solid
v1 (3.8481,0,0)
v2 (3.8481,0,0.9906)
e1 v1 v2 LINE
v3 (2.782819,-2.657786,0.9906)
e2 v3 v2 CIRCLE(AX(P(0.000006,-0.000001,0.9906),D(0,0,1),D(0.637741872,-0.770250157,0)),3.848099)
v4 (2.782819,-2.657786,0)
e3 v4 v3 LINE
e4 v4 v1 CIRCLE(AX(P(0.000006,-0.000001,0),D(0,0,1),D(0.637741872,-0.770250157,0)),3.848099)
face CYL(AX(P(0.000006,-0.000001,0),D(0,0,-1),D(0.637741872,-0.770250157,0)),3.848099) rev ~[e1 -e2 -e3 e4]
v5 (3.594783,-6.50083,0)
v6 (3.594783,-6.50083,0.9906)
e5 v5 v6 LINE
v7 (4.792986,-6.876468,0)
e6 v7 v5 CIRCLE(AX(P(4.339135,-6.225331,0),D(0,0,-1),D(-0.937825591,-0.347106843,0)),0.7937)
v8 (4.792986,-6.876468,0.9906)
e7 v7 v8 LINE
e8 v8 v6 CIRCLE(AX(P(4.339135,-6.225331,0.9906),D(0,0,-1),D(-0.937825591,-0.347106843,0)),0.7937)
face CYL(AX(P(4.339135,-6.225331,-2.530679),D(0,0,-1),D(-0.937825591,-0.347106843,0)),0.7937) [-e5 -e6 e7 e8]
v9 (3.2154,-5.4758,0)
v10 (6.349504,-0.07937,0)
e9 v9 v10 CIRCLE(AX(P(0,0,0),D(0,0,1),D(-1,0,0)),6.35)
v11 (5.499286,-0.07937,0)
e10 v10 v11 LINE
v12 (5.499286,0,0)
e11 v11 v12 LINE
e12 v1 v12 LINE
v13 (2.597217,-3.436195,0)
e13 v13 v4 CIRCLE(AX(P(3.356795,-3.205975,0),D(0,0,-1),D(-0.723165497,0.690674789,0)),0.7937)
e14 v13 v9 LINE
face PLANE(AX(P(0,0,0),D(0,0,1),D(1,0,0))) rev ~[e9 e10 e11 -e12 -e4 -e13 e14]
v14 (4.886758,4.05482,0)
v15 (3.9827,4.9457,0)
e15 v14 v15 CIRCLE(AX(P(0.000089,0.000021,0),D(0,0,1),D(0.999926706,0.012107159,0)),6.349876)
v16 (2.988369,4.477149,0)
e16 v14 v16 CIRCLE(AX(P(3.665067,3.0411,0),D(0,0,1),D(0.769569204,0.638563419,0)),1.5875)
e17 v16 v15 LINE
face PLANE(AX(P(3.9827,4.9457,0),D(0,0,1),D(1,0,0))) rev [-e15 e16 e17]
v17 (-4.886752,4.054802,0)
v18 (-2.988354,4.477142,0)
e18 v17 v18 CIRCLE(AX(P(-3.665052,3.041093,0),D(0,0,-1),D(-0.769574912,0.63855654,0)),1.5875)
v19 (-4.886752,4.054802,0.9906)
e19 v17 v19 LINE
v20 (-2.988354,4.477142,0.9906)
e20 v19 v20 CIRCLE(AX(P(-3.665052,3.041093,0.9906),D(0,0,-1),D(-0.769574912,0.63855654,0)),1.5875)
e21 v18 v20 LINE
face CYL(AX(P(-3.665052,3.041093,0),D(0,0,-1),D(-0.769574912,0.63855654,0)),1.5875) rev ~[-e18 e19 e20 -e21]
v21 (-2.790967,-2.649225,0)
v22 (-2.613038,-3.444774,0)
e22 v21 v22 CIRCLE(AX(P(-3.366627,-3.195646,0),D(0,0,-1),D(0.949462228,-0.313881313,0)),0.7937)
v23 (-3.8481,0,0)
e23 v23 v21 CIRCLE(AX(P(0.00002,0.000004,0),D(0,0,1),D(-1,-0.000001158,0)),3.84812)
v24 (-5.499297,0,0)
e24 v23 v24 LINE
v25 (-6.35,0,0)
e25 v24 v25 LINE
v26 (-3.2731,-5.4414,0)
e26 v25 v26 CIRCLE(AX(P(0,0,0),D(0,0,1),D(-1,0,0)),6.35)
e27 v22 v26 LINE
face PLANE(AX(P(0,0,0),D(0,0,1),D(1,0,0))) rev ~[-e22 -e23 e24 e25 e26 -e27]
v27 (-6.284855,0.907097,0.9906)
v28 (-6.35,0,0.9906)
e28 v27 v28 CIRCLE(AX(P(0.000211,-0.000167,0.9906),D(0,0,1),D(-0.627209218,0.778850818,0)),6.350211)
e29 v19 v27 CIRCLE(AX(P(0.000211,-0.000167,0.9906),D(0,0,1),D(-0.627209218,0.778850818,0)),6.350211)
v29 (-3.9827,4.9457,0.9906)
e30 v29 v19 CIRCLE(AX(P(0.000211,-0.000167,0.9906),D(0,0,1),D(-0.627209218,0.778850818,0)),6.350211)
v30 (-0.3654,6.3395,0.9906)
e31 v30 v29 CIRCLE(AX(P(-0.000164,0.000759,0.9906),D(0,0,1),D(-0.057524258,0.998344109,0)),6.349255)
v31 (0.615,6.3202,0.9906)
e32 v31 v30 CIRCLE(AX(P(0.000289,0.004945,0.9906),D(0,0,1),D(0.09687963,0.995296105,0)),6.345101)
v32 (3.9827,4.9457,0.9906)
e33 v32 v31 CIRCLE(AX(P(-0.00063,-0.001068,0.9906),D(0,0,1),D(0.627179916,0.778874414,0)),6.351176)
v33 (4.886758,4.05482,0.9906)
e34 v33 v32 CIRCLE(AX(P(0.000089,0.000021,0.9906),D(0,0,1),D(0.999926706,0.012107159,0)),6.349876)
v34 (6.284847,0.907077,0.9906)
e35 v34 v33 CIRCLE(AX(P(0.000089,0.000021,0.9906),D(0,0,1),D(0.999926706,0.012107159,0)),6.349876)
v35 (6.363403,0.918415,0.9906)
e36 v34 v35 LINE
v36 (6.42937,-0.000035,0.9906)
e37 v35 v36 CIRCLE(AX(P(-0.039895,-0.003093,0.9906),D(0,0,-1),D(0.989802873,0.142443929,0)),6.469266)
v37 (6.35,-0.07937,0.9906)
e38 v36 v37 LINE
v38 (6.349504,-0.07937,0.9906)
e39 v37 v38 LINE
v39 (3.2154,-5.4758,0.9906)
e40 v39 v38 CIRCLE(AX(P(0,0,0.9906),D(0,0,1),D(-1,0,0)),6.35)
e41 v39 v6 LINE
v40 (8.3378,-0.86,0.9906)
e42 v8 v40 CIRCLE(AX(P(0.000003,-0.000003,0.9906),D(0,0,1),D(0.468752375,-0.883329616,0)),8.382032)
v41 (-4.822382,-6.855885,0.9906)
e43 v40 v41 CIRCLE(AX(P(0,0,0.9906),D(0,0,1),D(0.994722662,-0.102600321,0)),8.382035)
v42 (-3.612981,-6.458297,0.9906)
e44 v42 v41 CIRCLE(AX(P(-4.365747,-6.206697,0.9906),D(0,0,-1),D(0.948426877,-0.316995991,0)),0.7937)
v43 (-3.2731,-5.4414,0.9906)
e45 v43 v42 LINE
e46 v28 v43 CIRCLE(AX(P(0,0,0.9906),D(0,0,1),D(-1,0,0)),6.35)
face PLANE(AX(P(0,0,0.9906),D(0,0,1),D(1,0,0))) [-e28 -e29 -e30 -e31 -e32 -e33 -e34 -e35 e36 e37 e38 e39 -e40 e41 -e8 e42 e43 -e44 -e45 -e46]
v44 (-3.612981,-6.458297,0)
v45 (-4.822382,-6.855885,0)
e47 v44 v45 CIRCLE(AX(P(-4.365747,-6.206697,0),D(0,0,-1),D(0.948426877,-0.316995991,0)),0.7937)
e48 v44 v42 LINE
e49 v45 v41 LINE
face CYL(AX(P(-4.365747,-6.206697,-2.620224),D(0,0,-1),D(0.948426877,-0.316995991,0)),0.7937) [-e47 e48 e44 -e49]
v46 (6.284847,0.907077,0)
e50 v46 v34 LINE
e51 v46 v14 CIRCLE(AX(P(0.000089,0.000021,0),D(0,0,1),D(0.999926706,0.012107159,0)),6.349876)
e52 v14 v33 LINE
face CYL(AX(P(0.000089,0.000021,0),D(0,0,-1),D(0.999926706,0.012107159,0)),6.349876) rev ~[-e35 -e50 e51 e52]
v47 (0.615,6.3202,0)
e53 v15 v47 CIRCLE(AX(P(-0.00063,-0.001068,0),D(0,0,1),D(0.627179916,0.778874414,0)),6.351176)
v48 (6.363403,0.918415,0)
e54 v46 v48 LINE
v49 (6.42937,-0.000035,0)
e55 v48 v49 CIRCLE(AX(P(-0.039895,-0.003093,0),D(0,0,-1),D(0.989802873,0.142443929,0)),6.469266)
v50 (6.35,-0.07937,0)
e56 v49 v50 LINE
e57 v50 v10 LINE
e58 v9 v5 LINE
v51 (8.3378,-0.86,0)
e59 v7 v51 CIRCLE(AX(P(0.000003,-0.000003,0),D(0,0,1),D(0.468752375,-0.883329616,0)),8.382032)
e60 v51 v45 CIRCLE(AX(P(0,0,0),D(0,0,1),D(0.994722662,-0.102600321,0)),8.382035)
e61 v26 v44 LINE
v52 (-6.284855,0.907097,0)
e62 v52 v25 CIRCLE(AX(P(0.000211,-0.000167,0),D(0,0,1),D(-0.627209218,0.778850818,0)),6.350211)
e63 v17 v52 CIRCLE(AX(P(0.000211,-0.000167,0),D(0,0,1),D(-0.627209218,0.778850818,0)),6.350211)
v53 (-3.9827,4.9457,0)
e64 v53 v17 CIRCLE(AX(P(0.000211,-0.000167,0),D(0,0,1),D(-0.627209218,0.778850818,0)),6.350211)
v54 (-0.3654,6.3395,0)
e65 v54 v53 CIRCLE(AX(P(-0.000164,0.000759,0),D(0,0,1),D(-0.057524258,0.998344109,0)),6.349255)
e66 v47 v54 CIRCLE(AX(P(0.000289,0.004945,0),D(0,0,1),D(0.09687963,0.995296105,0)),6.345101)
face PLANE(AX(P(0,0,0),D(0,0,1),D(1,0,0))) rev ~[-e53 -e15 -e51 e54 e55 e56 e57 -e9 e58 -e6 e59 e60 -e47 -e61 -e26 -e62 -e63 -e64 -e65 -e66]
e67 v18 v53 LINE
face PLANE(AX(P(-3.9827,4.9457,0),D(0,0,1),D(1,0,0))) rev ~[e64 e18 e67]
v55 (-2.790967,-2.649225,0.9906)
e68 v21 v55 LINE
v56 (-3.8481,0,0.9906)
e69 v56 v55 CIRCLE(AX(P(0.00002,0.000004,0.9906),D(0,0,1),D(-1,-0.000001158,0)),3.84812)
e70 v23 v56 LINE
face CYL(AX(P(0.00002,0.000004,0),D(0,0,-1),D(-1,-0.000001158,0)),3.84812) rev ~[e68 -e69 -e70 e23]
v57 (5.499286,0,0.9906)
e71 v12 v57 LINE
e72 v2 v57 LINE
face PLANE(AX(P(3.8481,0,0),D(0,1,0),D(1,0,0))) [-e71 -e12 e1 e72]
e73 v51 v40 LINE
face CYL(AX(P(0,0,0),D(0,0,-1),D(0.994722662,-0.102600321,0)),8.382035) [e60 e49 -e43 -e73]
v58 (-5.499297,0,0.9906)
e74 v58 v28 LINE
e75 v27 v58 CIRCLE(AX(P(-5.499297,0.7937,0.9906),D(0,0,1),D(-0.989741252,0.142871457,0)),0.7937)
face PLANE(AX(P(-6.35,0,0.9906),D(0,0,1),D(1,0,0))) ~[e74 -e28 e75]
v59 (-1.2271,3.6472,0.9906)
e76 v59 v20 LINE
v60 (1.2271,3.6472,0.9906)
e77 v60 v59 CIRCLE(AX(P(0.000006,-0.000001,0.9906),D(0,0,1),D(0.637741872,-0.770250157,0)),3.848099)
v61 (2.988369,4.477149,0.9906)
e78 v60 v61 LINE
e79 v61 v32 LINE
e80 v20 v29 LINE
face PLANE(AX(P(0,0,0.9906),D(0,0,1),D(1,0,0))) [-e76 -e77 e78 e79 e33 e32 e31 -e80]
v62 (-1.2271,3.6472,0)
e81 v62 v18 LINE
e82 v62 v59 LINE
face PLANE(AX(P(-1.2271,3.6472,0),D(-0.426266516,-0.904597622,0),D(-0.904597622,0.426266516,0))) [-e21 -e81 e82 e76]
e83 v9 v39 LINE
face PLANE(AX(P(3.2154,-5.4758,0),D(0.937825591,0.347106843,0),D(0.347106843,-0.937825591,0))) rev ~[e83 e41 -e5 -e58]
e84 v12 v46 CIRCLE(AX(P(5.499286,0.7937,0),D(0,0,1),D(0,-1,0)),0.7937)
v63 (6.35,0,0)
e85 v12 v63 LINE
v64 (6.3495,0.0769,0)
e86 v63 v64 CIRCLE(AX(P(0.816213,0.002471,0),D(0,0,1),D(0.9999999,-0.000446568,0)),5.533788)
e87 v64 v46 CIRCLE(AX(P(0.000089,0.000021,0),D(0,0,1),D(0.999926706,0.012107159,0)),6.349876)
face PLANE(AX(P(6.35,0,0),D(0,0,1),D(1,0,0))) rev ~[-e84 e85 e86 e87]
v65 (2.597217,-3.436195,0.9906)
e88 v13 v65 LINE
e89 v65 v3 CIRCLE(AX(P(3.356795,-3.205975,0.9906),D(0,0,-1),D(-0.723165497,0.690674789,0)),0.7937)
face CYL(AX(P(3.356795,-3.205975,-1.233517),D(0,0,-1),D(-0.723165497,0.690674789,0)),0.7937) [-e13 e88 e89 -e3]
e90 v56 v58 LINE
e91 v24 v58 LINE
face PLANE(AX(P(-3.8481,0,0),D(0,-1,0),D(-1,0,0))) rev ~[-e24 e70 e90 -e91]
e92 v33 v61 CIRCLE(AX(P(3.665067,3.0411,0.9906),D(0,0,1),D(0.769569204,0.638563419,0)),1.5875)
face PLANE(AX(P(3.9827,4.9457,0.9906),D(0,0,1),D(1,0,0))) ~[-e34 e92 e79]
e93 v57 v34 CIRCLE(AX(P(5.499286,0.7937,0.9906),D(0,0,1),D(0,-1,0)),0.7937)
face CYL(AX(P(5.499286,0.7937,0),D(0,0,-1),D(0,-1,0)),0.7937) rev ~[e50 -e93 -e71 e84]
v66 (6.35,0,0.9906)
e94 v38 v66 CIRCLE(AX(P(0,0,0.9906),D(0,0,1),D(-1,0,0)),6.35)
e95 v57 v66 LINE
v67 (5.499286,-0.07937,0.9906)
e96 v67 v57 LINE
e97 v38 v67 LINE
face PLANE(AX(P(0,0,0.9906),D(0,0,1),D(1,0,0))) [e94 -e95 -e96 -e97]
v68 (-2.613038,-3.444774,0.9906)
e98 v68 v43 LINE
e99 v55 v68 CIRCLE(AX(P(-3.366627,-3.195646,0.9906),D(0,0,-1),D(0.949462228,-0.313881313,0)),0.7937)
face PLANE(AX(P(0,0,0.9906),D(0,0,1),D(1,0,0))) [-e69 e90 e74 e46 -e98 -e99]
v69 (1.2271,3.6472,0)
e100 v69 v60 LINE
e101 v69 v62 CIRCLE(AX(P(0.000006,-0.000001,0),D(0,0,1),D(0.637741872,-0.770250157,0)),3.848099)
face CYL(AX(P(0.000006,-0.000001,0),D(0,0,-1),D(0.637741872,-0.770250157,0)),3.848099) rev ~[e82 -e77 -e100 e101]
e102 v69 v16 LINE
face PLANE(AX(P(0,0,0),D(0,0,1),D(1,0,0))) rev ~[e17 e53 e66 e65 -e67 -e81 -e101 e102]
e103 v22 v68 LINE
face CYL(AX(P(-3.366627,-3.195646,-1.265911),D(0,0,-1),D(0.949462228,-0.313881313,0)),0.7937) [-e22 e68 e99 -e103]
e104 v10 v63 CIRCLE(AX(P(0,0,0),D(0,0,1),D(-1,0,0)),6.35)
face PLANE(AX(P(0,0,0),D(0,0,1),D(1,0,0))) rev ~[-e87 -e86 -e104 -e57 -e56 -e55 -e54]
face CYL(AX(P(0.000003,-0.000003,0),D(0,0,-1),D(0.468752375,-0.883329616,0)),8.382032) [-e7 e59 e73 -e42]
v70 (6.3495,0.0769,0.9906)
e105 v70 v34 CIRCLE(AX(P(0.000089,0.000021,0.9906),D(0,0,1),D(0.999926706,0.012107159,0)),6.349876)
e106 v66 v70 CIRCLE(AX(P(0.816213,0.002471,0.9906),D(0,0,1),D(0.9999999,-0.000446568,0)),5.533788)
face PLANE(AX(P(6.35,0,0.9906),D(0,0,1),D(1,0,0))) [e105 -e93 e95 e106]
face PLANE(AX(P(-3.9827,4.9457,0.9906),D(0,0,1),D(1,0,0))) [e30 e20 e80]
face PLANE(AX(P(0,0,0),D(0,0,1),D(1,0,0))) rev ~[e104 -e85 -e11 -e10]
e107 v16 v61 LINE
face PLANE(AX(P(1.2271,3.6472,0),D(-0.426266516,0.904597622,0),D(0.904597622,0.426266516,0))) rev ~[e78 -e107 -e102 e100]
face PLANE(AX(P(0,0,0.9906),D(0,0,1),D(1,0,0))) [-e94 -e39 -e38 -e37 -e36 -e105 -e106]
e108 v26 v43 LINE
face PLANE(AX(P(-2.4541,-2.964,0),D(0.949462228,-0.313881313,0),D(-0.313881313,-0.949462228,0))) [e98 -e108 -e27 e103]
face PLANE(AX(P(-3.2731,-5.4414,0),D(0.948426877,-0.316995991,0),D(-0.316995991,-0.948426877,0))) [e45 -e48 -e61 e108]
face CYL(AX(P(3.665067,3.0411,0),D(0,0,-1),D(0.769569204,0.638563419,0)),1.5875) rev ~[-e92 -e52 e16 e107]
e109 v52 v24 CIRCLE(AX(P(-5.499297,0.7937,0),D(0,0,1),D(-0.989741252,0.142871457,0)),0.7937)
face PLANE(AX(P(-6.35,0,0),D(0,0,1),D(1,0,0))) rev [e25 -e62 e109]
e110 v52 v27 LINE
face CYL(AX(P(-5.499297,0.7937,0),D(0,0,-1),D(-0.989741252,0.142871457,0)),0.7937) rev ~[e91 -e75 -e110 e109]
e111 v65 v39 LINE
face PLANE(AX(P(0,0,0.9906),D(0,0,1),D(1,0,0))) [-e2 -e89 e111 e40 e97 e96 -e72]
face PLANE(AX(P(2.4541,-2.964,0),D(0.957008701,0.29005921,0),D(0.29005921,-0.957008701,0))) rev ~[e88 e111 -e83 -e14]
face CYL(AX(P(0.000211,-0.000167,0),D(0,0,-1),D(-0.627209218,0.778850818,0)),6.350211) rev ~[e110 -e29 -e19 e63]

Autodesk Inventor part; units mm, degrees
ref_plane "YZ Plane" through (0, 0, 0) normal (1, 0, 0) x (0, 1, 0)
ref_plane "XZ Plane" through (0, 0, 0) normal (0, 1, 0) x (-1, 0, 0)
ref_plane "XY Plane" through (0, 0, 0) normal (0, 0, 1) x (1, 0, 0)
sketch "Sketch1" plane through (0, 0, 0) normal (0, 0, 1) x (1, 0, 0)
  arc A0 (2.4541, -2.964) -> (-1.2271, 3.6472) centre (0, 0) ccw
  arc A1 (3.9291, -7.4041) -> (8.3378, -0.86) centre (0, 0) ccw
  arc A2 (-3.9827, 4.9457) -> (-6.35, 0) centre (0, 0) ccw
  line L0 (1.2271, 3.6472) -> (3.9827, 4.9457)
  line L1 (-1.2271, 3.6472) -> (-3.9827, 4.9457)
  line L2 (3.8481, 0) -> (6.35, 0)
  line L3 (-3.8481, 0) -> (-6.35, 0)
  line L4 (2.4541, -2.964) -> (3.2154, -5.4758)
  line L5 (-2.4541, -2.964) -> (-3.2731, -5.4414)
  arc A3 (3.9827, 4.9457) -> (0.615, 6.3202) centre (0, 0) ccw
  arc A4 (0.615, 6.3202) -> (-0.3654, 6.3395) centre (0, 0) ccw
  arc A5 (6.35, 0) -> (6.3495, 0.0769) centre (0, 0) ccw
  line L6 (3.2154, -5.4758) -> (3.9291, -7.4041)
  arc A6 (-3.9291, -7.4041) -> (3.9291, -7.4041) centre (0, 0) ccw
  arc A7 (8.3378, -0.86) -> (-3.9291, -7.4041) centre (0, 0) ccw
  arc A8 (-2.4541, -2.964) -> (2.4541, -2.964) centre (0, 0) ccw
  arc A9 (-6.35, 0) -> (6.35, 0) centre (0, 0) ccw
  arc A10 (-3.8481, 0) -> (-2.4541, -2.964) centre (0, 0) ccw
  arc A11 (-1.2271, 3.6472) -> (-3.8481, 0) centre (0, 0) ccw
  arc A12 (-0.3654, 6.3395) -> (-3.9827, 4.9457) centre (0, 0) ccw
  arc A13 (6.3495, 0.0769) -> (3.9827, 4.9457) centre (0, 0) ccw
  line L7 (-3.2731, -5.4414) -> (-3.9291, -7.4041)
  dimension "d0" = 16.764
  dimension "d1" = 7.6962
  dimension "d2" = 12.7
extrude "Extrusion1" add sketch "Sketch1" along normal blind 0.9906 contours A0 L2 A9 L4 | A9 A5 A13 A3 A4 A12 A2 L7 A7 A1 L6 | L5 A9 L3 A10 | A0 L1 A12 A4 A3 L0
fillet "Fillet1" radius 1.5875 2 edges at (-3.9827, 4.9457, 0.4953) (3.9827, 4.9457, 0.4953)
fillet "Fillet2" radius 0.7937 6 edges at (-6.35, 0, 0.4953) (6.35, 0, 0.4953) (-2.4541, -2.964, 0.4953) (2.4541, -2.964, 0.4953) (3.9291, -7.4041, 0.4953) (-3.9291, -7.4041, 0.4953)
properties part number "e clip .375in x ,039"
